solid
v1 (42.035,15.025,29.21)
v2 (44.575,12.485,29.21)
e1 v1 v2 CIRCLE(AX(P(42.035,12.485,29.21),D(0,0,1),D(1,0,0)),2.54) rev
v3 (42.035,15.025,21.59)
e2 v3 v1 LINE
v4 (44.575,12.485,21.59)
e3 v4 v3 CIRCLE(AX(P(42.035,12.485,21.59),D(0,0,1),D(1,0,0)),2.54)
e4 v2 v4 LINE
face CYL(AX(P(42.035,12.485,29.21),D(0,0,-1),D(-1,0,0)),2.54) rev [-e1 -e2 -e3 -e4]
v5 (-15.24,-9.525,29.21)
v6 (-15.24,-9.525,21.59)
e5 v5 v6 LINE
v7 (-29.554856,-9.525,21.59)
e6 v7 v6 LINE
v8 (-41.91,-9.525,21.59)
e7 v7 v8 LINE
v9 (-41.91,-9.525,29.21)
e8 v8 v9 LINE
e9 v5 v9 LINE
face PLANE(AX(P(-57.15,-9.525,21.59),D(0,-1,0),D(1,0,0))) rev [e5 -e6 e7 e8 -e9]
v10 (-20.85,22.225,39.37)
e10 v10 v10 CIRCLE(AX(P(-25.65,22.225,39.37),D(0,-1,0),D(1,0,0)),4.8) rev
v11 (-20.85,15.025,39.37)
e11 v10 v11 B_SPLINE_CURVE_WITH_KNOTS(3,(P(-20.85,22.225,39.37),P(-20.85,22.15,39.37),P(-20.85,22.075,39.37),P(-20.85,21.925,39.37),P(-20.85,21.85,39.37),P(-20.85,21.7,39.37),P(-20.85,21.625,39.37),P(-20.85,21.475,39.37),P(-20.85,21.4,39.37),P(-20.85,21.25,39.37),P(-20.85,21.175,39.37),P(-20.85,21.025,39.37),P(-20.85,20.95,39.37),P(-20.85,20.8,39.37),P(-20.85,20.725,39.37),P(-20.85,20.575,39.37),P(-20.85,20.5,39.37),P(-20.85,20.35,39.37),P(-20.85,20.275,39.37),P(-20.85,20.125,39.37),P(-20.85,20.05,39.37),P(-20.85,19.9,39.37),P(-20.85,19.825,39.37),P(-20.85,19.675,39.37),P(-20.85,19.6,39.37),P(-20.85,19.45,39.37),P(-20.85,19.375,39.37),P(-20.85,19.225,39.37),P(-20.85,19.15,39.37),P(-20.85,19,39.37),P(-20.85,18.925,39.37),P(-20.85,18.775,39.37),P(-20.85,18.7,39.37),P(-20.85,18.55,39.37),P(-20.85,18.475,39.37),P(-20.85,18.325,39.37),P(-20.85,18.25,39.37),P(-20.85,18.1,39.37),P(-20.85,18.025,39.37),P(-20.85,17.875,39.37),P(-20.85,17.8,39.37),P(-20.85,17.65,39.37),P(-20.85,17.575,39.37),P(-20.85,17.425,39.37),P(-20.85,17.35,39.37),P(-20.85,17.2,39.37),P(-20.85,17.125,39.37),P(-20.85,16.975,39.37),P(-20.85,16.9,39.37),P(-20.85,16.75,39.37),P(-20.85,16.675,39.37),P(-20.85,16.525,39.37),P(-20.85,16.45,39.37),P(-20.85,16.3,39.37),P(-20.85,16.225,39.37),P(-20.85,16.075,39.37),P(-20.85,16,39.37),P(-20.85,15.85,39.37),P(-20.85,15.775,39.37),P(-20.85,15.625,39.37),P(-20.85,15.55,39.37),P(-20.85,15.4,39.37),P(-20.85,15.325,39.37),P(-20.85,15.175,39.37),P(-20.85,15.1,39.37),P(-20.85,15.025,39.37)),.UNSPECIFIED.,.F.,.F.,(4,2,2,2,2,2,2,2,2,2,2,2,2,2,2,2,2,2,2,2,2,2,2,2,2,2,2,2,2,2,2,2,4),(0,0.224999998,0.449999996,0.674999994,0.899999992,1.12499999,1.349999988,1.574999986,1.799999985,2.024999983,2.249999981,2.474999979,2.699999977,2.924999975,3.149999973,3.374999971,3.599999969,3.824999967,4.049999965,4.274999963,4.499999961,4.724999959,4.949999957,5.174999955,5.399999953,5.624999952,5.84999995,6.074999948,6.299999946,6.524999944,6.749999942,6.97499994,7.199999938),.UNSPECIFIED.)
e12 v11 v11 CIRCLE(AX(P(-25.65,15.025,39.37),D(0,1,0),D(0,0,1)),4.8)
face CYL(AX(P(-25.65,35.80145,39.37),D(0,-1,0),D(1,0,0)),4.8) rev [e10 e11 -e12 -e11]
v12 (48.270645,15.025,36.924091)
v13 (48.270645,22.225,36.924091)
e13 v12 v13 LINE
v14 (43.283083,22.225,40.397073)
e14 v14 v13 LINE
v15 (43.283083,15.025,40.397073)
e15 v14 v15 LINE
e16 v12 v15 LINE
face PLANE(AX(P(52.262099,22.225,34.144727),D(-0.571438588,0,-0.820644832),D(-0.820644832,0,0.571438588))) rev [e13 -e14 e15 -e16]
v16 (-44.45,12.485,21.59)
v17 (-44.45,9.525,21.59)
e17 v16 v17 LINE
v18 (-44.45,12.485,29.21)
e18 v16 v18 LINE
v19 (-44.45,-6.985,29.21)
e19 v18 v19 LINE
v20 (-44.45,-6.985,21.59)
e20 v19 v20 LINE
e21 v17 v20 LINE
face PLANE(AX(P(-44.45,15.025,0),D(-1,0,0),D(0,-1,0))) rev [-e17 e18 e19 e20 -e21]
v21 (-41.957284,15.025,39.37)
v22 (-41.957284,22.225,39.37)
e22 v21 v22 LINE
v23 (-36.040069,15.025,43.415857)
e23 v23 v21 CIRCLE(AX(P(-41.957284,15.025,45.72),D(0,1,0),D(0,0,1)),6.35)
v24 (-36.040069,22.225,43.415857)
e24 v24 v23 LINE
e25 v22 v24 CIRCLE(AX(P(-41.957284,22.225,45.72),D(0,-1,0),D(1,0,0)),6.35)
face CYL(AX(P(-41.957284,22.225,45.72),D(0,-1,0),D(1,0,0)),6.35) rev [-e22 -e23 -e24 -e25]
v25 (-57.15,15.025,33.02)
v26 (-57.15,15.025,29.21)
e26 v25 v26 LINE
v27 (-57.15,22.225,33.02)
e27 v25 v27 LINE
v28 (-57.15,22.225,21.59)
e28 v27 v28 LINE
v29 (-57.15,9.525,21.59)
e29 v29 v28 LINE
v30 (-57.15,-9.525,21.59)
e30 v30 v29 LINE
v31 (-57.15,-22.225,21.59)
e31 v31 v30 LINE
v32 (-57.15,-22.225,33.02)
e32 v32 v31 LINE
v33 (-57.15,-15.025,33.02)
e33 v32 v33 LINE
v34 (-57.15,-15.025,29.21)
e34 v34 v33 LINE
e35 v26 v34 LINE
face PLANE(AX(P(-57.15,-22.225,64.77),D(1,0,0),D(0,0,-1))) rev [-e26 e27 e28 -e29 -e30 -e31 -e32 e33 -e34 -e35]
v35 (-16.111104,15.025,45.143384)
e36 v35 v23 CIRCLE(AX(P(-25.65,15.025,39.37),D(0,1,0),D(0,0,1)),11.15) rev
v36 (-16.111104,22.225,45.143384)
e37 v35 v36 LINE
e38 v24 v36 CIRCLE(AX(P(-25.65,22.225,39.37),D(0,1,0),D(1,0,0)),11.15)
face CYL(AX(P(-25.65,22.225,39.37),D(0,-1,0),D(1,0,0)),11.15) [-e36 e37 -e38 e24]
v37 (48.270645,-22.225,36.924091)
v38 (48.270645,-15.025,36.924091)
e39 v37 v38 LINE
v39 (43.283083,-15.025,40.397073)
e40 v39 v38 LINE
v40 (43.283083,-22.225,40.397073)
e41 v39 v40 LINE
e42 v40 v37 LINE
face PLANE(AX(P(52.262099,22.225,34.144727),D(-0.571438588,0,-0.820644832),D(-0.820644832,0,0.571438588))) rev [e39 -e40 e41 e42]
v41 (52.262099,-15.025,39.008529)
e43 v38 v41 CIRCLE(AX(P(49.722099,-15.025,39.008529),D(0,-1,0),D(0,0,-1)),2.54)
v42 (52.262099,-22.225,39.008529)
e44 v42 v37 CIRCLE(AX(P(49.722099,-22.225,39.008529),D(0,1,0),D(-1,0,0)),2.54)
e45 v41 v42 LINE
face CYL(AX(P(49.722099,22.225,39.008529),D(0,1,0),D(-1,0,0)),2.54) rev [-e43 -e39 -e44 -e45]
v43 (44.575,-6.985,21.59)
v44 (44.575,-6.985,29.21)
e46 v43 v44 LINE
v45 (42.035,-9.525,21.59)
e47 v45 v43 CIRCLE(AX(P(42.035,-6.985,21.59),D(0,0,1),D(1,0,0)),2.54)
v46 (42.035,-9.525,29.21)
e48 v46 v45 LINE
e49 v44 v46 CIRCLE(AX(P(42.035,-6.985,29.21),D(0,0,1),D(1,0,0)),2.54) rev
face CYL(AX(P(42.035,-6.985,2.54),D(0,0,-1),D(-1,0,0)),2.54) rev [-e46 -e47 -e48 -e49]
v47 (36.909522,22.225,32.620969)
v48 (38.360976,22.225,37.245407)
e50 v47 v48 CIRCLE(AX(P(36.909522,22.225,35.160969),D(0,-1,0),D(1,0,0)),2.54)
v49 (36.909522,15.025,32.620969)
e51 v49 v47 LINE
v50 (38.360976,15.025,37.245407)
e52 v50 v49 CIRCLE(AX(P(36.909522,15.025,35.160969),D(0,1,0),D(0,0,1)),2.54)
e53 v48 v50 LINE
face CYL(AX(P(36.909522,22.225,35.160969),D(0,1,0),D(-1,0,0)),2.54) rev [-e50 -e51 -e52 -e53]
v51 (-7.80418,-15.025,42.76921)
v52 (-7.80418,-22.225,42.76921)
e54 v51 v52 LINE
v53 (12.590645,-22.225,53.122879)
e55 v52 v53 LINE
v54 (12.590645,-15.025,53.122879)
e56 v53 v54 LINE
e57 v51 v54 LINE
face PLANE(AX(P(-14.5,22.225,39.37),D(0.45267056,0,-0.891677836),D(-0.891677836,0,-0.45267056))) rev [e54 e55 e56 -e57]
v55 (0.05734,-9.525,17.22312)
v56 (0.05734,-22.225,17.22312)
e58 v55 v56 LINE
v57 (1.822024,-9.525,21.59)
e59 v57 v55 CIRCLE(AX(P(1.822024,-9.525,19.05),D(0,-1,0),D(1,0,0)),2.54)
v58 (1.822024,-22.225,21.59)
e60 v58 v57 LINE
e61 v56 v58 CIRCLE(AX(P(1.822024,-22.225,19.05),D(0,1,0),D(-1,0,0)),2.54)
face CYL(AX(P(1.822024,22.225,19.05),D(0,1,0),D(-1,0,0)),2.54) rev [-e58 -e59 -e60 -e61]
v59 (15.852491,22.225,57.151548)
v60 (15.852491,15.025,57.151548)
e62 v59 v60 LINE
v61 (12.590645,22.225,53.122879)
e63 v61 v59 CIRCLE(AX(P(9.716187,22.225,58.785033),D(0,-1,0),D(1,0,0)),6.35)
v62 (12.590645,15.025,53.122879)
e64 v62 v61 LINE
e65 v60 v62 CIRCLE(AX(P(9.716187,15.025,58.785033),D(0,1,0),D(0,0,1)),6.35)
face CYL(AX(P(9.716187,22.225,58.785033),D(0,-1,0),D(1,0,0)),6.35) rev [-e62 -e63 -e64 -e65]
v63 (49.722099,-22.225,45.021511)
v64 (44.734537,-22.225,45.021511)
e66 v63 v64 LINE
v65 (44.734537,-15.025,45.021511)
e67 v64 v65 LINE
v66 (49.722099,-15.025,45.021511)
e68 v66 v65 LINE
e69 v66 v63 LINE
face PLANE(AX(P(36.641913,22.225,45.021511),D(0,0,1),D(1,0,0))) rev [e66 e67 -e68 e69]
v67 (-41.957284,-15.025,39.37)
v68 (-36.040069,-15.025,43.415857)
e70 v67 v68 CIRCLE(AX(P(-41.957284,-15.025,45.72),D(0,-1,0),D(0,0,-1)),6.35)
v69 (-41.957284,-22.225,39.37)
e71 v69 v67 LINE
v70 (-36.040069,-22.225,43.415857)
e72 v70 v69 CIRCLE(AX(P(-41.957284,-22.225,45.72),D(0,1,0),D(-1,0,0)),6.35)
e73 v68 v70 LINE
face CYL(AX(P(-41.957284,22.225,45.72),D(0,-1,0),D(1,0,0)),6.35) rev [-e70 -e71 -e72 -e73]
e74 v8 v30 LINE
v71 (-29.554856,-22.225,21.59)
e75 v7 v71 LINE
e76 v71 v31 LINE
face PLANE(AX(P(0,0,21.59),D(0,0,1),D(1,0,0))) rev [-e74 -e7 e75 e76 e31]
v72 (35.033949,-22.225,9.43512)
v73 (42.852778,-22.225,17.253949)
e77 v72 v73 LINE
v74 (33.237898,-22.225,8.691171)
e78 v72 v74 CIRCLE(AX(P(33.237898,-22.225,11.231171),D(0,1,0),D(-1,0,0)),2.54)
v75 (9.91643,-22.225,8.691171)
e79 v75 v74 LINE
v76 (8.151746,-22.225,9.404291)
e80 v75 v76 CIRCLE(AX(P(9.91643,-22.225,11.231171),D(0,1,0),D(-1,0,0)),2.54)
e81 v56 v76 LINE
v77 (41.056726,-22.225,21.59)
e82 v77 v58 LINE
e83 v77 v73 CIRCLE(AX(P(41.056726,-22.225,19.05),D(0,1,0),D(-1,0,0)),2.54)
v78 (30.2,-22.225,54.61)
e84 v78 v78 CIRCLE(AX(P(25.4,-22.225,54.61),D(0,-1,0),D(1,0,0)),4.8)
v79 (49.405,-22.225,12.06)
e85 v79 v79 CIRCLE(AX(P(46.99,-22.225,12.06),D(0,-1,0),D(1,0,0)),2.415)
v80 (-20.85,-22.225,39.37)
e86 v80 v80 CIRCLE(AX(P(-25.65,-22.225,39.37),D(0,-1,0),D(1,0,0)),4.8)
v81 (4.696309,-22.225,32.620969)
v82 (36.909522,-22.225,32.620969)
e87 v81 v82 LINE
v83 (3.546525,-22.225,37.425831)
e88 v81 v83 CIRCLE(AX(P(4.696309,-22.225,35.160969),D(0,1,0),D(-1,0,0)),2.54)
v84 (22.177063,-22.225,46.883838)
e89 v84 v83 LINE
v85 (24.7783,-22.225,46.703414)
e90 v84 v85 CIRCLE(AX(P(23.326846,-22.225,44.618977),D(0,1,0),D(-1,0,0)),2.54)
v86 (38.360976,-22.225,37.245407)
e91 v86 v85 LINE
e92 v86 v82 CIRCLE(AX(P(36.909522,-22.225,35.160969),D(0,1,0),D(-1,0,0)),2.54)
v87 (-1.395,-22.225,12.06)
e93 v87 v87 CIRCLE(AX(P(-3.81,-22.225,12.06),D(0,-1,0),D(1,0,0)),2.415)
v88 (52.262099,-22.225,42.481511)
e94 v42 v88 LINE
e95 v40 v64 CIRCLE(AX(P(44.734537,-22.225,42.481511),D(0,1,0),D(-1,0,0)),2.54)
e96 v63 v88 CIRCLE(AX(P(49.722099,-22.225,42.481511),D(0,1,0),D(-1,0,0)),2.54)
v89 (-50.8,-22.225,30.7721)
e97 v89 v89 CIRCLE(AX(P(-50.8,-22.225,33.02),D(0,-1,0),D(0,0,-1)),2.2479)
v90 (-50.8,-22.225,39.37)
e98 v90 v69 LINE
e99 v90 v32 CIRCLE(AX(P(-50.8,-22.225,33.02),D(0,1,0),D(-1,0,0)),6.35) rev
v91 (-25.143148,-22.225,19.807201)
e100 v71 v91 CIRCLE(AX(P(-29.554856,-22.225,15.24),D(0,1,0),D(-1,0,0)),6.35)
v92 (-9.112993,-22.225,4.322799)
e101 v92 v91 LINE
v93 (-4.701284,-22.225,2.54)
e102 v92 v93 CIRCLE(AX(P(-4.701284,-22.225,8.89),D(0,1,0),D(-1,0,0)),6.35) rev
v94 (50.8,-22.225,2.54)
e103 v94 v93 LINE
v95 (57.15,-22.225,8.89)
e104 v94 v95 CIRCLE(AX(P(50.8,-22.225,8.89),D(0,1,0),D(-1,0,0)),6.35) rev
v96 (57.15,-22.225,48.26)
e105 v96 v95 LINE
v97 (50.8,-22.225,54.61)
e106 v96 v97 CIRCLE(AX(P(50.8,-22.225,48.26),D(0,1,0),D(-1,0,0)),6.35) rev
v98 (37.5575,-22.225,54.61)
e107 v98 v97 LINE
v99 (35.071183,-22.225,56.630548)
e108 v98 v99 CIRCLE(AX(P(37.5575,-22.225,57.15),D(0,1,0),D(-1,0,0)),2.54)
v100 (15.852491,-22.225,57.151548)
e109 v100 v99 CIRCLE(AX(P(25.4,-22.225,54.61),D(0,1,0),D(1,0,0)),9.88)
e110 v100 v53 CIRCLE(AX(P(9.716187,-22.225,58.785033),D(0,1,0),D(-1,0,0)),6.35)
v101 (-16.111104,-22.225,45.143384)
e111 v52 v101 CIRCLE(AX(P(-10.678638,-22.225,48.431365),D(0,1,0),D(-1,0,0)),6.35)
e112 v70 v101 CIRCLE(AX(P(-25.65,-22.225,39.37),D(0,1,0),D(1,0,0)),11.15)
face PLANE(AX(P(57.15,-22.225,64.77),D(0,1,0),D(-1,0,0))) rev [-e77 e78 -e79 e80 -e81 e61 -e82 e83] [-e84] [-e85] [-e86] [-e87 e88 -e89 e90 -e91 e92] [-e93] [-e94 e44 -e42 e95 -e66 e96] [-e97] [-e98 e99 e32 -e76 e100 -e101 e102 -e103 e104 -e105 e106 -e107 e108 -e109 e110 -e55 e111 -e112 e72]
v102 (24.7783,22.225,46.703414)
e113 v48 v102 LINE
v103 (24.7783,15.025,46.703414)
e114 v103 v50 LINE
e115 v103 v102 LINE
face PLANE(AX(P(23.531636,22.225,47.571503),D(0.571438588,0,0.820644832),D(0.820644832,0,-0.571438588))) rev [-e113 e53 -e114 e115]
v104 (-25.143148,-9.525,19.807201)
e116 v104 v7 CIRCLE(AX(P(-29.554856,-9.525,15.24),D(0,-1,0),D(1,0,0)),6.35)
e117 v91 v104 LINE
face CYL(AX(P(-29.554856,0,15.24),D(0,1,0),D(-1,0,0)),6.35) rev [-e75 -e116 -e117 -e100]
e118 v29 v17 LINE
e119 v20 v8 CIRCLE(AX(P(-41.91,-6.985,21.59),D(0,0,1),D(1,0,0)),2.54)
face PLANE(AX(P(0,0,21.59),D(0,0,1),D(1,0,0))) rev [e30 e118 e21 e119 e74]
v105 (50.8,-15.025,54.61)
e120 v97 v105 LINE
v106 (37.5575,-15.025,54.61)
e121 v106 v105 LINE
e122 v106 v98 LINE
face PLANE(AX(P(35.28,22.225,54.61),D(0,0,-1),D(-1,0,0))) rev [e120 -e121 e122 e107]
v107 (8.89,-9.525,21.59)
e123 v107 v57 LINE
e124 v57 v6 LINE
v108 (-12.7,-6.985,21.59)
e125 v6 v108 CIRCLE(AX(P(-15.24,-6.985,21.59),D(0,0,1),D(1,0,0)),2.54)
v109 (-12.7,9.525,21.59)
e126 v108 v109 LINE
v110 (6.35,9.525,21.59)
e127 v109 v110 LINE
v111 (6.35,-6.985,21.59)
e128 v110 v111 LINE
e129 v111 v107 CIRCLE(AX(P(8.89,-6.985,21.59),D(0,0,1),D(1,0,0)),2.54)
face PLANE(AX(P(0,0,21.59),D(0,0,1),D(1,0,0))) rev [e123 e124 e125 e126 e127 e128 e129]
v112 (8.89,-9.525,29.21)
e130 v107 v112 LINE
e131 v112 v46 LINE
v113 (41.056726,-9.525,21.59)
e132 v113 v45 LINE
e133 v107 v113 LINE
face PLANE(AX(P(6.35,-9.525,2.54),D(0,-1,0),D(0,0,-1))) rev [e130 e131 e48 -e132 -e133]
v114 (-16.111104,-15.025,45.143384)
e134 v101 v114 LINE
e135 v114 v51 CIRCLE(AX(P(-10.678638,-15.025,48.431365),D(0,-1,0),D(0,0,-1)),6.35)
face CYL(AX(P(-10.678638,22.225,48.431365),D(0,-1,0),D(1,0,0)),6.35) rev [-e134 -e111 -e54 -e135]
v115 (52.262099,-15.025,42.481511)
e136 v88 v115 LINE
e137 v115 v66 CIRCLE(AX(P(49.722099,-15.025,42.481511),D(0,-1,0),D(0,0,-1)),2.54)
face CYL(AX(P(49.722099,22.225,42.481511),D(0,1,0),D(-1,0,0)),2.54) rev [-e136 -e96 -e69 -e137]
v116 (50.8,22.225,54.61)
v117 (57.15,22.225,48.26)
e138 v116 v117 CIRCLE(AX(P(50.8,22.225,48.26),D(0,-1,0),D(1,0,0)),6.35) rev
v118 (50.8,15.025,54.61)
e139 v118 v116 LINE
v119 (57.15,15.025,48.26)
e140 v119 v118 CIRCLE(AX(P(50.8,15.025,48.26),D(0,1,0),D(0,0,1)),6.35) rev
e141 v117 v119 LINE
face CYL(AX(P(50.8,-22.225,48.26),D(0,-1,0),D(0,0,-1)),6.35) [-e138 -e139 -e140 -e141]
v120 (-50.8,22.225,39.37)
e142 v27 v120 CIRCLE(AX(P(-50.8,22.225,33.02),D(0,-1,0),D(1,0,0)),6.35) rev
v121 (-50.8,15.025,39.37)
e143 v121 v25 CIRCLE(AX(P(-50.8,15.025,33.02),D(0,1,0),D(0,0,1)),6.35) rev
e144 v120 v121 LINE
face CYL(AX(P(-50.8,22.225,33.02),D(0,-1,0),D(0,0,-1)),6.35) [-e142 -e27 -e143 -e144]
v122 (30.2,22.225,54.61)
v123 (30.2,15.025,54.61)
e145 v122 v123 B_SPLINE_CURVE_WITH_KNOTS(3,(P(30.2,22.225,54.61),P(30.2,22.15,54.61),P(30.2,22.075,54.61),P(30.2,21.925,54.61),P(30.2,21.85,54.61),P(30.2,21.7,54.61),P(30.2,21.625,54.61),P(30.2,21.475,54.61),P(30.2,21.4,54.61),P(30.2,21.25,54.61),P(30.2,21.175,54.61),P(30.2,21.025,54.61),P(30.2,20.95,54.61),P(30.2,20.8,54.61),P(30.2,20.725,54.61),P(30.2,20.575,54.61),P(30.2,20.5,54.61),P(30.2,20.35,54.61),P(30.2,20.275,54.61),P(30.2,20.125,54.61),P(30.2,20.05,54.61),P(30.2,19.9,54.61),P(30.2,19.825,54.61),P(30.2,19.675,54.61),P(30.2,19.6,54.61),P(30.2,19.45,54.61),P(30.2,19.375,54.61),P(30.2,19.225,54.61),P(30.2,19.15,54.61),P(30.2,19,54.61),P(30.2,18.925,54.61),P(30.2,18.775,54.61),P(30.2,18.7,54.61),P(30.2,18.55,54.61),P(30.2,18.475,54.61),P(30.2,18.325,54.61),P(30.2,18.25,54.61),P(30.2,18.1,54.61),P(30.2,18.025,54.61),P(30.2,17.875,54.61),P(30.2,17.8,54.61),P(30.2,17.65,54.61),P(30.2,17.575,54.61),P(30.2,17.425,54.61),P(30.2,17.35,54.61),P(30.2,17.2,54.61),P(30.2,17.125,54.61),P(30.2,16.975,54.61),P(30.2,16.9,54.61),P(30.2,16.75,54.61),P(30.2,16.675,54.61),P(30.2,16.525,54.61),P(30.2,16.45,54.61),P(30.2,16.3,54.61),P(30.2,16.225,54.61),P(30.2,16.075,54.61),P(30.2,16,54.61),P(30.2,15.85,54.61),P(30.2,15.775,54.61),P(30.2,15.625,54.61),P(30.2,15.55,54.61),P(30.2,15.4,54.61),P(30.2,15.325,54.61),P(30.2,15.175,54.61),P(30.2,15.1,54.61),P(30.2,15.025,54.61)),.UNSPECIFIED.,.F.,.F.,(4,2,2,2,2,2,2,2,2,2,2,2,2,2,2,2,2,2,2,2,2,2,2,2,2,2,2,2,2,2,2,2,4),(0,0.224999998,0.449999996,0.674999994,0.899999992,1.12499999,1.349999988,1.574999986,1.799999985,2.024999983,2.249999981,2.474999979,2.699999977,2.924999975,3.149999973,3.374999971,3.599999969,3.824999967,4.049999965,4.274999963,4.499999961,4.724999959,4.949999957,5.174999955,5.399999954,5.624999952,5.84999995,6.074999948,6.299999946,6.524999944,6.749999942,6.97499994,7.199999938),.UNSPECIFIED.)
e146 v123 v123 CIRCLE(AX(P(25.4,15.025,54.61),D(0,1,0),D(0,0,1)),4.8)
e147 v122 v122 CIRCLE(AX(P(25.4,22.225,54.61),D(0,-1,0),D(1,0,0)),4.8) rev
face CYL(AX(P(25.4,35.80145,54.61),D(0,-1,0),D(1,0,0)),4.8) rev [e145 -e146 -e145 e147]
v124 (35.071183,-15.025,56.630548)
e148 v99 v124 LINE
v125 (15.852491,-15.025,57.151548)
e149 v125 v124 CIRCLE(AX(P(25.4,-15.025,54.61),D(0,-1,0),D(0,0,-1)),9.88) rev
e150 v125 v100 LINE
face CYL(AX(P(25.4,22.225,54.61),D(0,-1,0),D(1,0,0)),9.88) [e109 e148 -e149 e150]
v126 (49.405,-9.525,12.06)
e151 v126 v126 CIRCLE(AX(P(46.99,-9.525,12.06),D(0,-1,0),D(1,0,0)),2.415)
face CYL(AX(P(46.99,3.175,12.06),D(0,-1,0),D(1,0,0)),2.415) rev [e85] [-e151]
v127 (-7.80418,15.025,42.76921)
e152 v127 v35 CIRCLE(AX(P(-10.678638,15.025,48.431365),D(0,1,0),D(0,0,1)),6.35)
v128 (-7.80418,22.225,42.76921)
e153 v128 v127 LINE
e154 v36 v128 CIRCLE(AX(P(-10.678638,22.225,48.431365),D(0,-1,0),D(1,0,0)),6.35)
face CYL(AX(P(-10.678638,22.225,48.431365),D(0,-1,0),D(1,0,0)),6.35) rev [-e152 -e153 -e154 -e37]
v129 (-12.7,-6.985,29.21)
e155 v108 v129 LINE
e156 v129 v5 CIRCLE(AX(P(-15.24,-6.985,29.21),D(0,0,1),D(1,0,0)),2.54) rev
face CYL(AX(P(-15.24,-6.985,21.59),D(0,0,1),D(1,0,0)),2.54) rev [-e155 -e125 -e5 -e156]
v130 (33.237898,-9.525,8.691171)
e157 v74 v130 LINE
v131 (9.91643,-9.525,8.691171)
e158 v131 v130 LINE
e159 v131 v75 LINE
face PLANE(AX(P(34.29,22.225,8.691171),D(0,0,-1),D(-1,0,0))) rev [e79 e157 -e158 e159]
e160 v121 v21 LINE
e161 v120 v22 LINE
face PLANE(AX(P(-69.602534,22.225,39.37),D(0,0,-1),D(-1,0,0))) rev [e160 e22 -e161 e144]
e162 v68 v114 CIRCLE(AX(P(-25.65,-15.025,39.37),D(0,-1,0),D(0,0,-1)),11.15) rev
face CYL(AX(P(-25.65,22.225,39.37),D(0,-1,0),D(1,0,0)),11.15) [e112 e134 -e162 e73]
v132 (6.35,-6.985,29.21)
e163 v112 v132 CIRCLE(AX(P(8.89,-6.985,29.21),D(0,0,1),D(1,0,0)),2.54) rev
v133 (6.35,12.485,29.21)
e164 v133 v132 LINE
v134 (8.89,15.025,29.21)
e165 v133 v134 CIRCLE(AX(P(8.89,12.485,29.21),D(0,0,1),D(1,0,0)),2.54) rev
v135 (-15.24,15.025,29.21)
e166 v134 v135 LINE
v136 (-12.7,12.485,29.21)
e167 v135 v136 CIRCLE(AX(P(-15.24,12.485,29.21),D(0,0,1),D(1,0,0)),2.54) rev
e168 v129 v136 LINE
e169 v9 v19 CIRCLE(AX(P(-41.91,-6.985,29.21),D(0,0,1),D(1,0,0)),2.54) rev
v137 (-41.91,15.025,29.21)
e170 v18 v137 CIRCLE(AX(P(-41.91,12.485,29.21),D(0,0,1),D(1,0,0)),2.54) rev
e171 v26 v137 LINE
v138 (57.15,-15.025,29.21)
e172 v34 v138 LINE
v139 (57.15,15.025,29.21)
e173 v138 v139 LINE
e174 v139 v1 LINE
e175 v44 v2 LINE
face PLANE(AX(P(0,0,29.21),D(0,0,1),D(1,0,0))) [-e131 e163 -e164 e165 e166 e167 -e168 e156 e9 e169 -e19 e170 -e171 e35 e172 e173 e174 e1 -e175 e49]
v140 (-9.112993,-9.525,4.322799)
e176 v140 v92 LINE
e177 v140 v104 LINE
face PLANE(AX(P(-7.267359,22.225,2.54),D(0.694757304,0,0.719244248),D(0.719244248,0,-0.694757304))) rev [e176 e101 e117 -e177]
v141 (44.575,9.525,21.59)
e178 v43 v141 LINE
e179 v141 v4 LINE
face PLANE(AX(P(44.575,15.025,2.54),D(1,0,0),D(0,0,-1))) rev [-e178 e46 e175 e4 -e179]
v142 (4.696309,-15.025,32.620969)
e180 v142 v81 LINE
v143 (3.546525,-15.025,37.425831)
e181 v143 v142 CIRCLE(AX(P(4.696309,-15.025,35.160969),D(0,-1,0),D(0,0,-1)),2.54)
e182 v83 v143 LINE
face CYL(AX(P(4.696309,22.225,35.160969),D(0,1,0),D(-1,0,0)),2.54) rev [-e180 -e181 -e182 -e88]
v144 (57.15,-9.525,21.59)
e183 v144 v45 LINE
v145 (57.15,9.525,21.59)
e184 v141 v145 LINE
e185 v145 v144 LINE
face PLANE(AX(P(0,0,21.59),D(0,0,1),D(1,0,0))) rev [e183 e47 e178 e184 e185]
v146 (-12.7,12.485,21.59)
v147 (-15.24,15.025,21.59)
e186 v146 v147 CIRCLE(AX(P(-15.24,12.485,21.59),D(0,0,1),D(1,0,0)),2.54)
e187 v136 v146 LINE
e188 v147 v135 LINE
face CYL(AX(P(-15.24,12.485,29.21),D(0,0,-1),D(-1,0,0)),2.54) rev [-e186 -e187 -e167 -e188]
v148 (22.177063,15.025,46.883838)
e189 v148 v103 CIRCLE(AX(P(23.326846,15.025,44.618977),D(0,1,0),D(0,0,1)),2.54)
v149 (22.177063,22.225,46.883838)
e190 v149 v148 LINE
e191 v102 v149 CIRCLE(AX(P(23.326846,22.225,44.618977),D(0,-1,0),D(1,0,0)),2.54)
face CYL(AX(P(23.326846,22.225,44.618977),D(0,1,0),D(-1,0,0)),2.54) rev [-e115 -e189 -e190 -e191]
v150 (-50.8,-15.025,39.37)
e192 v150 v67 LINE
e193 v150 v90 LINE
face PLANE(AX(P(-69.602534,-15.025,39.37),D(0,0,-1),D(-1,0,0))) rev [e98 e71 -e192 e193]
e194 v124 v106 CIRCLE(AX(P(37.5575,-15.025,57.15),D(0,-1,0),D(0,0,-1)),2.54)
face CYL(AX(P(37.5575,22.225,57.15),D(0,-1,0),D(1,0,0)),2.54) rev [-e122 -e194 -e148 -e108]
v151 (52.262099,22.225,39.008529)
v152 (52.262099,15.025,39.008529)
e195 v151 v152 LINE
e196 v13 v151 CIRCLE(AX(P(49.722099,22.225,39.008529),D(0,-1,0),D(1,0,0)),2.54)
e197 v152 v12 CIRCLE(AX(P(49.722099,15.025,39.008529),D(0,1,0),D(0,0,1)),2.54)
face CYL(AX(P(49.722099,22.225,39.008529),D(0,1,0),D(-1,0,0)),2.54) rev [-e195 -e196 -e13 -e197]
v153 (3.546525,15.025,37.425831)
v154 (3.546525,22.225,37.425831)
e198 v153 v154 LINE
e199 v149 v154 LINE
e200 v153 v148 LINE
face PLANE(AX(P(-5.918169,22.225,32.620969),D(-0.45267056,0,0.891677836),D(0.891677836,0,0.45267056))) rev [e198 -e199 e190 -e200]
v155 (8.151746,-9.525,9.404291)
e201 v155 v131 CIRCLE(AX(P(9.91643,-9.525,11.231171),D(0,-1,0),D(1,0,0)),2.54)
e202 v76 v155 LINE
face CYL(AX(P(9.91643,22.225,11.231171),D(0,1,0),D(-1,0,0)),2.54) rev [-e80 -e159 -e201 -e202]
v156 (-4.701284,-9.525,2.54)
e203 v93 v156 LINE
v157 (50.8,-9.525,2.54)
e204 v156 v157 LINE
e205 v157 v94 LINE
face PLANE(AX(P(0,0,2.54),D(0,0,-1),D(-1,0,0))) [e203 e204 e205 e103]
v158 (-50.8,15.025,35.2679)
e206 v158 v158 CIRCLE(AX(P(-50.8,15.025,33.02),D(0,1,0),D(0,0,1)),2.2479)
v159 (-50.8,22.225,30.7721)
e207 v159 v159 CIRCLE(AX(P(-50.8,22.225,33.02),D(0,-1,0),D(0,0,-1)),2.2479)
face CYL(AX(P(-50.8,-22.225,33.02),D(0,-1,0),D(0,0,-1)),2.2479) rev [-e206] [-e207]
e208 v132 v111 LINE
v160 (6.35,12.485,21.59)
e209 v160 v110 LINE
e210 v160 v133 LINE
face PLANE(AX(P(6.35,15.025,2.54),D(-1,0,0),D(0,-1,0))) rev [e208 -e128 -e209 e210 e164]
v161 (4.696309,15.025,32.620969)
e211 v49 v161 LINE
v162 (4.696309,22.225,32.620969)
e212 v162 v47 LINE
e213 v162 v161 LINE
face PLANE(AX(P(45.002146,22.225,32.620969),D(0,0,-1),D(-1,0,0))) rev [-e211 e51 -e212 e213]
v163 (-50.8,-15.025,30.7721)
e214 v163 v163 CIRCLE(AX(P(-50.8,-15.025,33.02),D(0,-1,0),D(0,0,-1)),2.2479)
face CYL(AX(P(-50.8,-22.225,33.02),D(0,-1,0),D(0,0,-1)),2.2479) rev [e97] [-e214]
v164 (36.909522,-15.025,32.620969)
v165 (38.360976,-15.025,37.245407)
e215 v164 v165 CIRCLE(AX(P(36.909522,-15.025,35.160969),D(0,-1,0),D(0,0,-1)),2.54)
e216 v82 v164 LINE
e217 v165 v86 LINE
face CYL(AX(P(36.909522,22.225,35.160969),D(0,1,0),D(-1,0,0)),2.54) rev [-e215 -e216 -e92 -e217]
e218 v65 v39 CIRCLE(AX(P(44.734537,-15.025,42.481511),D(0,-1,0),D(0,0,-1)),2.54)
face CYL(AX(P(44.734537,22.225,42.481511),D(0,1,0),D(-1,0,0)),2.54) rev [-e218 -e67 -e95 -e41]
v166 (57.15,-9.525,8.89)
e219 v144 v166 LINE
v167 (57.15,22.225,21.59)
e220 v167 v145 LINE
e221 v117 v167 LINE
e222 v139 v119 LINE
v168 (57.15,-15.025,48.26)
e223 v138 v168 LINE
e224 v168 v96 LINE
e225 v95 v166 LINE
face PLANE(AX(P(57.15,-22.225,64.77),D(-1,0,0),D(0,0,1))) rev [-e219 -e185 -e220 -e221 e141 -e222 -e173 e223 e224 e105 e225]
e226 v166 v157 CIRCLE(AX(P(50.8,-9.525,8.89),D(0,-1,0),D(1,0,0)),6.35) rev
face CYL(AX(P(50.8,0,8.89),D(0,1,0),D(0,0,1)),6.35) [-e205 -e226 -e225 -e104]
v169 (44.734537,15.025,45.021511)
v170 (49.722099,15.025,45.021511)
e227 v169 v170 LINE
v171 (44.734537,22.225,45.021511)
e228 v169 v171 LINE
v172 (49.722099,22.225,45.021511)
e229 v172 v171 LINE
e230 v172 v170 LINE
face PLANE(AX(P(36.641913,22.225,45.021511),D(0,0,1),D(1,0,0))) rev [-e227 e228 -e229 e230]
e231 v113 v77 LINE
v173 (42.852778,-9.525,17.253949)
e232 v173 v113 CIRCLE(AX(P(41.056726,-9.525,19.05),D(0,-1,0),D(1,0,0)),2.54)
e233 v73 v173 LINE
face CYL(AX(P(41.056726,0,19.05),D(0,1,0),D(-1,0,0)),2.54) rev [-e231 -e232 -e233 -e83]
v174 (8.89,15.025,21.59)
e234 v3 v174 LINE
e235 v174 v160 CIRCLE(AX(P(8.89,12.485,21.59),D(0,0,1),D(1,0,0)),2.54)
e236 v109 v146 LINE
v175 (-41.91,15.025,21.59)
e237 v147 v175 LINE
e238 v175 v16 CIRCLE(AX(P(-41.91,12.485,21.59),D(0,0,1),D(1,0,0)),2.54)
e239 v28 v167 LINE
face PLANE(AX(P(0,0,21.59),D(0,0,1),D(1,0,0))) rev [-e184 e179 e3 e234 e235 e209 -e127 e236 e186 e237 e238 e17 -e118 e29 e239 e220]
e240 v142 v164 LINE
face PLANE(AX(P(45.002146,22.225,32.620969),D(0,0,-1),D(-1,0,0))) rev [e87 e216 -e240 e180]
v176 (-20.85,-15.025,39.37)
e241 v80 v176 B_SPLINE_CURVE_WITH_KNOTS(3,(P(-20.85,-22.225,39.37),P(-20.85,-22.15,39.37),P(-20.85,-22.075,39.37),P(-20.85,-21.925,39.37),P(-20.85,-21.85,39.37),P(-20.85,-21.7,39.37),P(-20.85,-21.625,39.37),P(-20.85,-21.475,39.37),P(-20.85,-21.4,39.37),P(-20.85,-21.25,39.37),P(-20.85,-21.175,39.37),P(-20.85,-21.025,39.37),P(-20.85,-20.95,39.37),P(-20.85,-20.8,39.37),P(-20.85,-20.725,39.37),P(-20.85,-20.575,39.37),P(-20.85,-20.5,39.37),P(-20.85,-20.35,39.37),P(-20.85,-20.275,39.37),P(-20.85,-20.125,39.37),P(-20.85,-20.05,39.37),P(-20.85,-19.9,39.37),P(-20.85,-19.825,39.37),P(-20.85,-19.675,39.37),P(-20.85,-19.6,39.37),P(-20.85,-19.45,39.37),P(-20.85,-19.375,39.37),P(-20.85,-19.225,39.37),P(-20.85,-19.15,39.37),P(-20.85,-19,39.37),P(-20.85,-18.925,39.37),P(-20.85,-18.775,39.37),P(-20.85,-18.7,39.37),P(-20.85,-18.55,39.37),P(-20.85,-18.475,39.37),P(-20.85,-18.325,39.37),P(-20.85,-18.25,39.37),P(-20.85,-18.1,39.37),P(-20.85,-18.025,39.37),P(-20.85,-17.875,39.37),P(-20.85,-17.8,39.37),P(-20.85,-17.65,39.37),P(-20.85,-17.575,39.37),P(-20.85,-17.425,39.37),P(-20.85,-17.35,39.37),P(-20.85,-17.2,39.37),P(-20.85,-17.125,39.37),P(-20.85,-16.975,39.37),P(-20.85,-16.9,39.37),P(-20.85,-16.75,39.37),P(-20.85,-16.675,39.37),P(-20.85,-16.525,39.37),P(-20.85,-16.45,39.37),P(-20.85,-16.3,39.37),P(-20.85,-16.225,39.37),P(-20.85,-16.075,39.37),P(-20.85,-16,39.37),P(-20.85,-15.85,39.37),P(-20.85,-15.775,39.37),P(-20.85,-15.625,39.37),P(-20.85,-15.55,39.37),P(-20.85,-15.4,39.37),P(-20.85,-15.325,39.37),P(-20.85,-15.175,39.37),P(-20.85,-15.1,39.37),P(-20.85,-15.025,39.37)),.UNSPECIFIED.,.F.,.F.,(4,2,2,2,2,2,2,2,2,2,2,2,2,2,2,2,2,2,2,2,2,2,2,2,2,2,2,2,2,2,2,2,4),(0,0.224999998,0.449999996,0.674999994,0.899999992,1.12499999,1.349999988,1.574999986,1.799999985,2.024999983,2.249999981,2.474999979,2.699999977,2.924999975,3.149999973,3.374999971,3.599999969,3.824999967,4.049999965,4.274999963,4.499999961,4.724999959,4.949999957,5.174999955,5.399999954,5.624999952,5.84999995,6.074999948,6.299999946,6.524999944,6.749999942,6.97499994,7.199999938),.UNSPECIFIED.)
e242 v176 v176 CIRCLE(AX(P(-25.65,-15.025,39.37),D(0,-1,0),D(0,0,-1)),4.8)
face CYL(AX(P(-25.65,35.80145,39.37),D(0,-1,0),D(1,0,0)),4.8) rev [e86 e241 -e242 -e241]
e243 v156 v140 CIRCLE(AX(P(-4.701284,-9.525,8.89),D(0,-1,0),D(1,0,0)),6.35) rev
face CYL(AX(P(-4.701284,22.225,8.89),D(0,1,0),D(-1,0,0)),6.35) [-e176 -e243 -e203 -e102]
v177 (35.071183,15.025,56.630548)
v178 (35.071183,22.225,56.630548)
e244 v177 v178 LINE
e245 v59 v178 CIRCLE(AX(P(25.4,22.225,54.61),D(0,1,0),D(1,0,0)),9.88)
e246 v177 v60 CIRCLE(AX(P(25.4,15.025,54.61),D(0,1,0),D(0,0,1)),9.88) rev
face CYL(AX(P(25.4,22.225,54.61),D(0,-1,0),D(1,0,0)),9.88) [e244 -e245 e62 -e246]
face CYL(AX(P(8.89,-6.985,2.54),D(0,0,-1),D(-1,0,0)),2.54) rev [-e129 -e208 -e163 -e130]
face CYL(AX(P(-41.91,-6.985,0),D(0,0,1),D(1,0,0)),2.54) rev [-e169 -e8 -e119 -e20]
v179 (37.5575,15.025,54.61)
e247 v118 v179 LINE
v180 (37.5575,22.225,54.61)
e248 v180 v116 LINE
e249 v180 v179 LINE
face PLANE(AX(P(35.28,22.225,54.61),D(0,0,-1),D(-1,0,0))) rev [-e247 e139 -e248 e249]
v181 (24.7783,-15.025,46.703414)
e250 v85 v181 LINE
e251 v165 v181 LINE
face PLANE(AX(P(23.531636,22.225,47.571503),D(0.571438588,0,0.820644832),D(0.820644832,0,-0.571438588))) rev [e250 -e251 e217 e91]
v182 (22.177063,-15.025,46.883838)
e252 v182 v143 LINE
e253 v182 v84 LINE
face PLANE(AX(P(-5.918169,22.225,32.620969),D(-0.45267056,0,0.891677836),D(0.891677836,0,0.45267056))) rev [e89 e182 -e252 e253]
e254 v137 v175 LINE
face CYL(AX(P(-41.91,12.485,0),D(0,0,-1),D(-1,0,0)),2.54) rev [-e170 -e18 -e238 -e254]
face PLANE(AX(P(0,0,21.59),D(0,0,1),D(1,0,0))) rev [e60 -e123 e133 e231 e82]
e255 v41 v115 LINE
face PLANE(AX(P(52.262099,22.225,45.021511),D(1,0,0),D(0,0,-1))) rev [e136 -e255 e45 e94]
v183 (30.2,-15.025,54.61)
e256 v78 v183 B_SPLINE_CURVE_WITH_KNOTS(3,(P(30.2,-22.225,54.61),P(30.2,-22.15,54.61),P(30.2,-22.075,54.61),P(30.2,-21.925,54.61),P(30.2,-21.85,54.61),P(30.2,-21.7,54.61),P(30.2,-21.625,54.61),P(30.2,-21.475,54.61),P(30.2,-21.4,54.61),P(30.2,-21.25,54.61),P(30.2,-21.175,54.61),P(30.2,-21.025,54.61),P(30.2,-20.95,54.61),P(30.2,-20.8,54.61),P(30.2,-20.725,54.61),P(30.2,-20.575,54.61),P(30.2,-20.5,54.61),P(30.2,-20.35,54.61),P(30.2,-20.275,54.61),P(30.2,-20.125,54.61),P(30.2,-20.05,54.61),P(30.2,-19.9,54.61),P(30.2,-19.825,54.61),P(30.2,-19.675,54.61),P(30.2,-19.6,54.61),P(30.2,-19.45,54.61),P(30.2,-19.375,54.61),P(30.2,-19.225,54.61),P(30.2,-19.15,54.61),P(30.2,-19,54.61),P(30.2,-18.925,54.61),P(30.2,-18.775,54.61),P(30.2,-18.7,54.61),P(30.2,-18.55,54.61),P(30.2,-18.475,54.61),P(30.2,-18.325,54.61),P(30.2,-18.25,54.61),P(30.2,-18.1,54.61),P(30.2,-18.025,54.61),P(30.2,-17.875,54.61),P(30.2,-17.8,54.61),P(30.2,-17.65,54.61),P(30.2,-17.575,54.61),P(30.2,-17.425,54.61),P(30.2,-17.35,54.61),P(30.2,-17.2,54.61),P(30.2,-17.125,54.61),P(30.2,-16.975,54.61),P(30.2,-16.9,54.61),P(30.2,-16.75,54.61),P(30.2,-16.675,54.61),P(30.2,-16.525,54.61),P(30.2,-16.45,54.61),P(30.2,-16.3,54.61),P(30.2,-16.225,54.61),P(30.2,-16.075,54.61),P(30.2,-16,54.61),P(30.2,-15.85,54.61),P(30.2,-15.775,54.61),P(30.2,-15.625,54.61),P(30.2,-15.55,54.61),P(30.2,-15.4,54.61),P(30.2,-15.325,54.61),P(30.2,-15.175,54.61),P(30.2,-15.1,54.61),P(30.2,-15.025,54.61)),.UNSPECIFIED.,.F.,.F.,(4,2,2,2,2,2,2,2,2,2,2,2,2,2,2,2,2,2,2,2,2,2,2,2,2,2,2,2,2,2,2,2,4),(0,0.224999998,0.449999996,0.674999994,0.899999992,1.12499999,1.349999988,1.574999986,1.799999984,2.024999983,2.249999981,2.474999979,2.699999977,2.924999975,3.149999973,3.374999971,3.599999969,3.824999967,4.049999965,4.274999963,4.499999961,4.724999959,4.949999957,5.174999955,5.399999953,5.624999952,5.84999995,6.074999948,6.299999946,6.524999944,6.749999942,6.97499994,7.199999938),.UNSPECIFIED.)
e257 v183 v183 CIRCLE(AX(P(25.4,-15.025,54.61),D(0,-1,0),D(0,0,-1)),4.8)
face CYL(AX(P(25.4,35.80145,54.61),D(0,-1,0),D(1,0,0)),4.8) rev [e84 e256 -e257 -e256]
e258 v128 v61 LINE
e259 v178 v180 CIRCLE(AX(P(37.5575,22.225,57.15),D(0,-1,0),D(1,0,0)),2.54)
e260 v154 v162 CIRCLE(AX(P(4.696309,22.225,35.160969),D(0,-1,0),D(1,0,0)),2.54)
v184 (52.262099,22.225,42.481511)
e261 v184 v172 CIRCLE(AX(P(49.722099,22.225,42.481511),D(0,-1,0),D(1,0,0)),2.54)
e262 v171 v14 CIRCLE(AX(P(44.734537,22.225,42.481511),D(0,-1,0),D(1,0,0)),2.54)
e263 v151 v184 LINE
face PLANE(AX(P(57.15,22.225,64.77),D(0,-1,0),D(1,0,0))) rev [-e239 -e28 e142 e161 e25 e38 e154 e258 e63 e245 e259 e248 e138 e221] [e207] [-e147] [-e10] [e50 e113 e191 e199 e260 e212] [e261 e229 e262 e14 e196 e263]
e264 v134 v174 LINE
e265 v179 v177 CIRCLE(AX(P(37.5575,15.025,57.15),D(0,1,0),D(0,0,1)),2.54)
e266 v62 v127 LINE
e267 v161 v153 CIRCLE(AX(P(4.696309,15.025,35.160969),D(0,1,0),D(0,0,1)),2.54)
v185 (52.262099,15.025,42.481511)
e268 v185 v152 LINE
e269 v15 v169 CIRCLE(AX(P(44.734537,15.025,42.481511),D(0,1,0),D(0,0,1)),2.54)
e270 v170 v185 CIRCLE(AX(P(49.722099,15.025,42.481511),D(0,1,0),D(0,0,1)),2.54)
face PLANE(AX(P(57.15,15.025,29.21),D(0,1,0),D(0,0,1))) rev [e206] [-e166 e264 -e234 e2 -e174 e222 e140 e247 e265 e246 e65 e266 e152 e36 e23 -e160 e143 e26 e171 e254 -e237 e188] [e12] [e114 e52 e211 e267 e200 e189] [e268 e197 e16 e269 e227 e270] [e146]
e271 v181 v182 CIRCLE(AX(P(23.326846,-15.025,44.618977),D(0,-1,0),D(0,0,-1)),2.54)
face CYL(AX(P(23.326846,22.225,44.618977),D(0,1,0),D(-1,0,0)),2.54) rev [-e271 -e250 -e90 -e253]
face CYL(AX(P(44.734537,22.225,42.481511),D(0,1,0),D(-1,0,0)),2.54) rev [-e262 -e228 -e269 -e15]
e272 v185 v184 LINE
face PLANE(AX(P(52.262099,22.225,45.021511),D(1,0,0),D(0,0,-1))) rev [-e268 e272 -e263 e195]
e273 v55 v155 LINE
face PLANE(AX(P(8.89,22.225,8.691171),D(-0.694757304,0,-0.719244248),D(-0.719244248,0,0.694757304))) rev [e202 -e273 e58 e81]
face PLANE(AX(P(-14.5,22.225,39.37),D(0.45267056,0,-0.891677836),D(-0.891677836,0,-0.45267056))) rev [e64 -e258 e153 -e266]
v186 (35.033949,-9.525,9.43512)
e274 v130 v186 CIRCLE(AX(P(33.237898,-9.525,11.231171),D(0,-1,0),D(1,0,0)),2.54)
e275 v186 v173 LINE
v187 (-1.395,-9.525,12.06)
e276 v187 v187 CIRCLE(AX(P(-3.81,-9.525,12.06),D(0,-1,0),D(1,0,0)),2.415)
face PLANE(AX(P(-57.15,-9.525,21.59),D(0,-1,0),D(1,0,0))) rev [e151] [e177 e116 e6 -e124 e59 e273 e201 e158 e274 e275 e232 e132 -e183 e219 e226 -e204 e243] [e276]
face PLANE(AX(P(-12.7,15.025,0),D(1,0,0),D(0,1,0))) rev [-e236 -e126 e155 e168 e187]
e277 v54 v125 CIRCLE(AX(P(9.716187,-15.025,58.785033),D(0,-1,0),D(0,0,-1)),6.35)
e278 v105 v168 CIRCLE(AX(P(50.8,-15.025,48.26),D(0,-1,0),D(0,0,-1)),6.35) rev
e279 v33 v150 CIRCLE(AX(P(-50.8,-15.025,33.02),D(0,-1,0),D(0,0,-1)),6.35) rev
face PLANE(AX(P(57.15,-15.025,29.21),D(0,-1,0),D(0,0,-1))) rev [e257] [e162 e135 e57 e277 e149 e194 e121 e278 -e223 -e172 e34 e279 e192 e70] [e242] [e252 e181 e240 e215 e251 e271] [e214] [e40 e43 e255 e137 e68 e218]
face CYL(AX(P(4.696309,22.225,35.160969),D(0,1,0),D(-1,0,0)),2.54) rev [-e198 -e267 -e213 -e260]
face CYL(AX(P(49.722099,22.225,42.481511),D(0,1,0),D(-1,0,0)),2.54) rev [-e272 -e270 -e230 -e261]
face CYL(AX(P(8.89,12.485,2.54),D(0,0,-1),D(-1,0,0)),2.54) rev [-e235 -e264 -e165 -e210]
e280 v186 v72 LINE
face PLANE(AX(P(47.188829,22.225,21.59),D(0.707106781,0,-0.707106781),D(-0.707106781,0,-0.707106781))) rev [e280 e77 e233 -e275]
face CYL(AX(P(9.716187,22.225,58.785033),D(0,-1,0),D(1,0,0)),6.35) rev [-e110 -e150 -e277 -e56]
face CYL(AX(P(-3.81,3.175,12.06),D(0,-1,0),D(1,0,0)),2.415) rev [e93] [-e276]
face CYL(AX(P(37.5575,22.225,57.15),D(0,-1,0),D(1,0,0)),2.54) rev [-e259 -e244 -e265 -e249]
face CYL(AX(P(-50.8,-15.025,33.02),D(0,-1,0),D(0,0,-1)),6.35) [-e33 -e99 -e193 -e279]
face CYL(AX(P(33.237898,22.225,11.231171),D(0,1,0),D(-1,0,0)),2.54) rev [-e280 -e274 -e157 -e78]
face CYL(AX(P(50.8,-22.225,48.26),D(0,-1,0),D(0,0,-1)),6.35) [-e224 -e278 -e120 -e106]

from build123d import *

# Parameters (mm, degrees)
SKETCH1_W               = 114.3
SKETCH1_H               = 44.45
BOSS_EXTRUDE1_DEPTH     = 64.77
SKETCH2_W               = 114.3
SKETCH2_H               = 30.050000124
CUT_EXTRUDE2_DEPTH      = 35.56
SKETCH3_W               = 114.3
SKETCH3_H               = 31.75
CUT_EXTRUDE3_DEPTH      = 21.59
SKETCH5_R               = 2.415
CUT_EXTRUDE4_DEPTH      = 25.4
CUT_EXTRUDE6_REACH      = 99.145
SKETCH7_R               = 4.8
CUT_EXTRUDE7_DEPTH      = 71.884319317
CUT_EXTRUDE7_DEPTH_BACK = 71.884319317
SKETCH9_W               = 31.75
SKETCH9_H               = 30.050000124
CUT_EXTRUDE8_DEPTH      = 98.144623629
BOSS_EXTRUDE2_REACH     = 99.632
SKETCH14_W              = 21.59
SKETCH14_H              = 5.500000062
SKETCH17_W              = 31.75
SKETCH17_H              = 5.500000062
BOSS_EXTRUDE3_DEPTH     = 7.62
SKETCH25_W              = 10.16
SKETCH25_H              = 7.199999938
BOSS_EXTRUDE5_DEPTH     = 20.35
F_8_CLEARANCE_HOLE1_D   = 4.4958
SKETCH31_W              = 114.3
SKETCH31_H              = 12.7
CUT_EXTRUDE9_DEPTH      = 2.54
CUT_EXTRUDE10_DEPTH     = 97.958161596
FILLET2_R               = 2.54
FILLET3_R               = 6.35
CUT_EXTRUDE11_DEPTH     = 97.958161596
SKETCH36_W              = 38.225
SKETCH36_H              = 24.550000062
CUT_EXTRUDE12_DEPTH     = 71.744268496
FILLET1_START           = -22.225
FILLET1_DEPTH           = 7.199999938
FILLET1_START_2         = 15.025000062
FILLET1_2_DEPTH         = 7.199999938
FILLET1_START_3         = -15.025000062
FILLET1_3_DEPTH         = 5.500000062
FILLET4_R               = 2.54


with BuildPart() as part:
    # Sketch1 → Boss-Extrude1 (new body)
    with BuildSketch(Plane.XY):
        Rectangle(SKETCH1_W, SKETCH1_H)
    extrude(amount=BOSS_EXTRUDE1_DEPTH)

    # Sketch2 → Cut-Extrude2 (cut)
    with BuildSketch(Plane.XY.offset(64.77)):
        Rectangle(SKETCH2_W, SKETCH2_H)
    extrude(amount=-CUT_EXTRUDE2_DEPTH, mode=Mode.SUBTRACT)

    # Sketch3 → Cut-Extrude3 (cut)
    with BuildSketch(Plane(origin=(0, 0, 0), x_dir=(-1, 0, 0), z_dir=(0, 0, -1))):
        with Locations((0, 6.35)):
            Rectangle(SKETCH3_W, SKETCH3_H)
    extrude(amount=-CUT_EXTRUDE3_DEPTH, mode=Mode.SUBTRACT)

    # Sketch5 → Cut-Extrude4 (cut)
    with BuildSketch(Plane.XZ.offset(22.225)):
        with Locations((-3.81, 12.06)):
            Circle(SKETCH5_R)
        with Locations((46.99, 12.06)):
            Circle(SKETCH5_R)
    extrude(amount=-CUT_EXTRUDE4_DEPTH, mode=Mode.SUBTRACT)

    # Cut-Extrude6: up to this face of the body (flat: up to its plane)
    cut_extrude6_end = Plane(part.part.faces().sort_by_distance((0, 22.225, 43.18))[0])
    # Sketch7 → Cut-Extrude6 (cut, up to the picked face)
    with BuildSketch(Plane.XZ.offset(22.225), mode=Mode.PRIVATE) as cut_extrude6_sk1:
        with Locations((25.4, 54.61)):
            Circle(SKETCH7_R)
    cut_extrude6_tool1 = split(extrude(cut_extrude6_sk1.sketch, amount=-CUT_EXTRUDE6_REACH, mode=Mode.PRIVATE), bisect_by=cut_extrude6_end, keep=Keep.BOTH, mode=Mode.PRIVATE)
    # Sketch7 → Cut-Extrude6 (cut, up to the picked face)
    with BuildSketch(Plane.XZ.offset(22.225), mode=Mode.PRIVATE) as cut_extrude6_sk2:
        with Locations((-25.65, 39.37)):
            Circle(SKETCH7_R)
    cut_extrude6_tool2 = split(extrude(cut_extrude6_sk2.sketch, amount=-CUT_EXTRUDE6_REACH, mode=Mode.PRIVATE), bisect_by=cut_extrude6_end, keep=Keep.BOTH, mode=Mode.PRIVATE)
    add(cut_extrude6_tool1.solids().sort_by(Axis((25.4, -22.225, 54.61), (0, 1, 0)))[0], mode=Mode.SUBTRACT)
    add(cut_extrude6_tool2.solids().sort_by(Axis((-25.65, -22.225, 39.37), (0, 1, 0)))[0], mode=Mode.SUBTRACT)

    # Sketch9 → Cut-Extrude7 (cut, two sides: drawn at the far end of the back side and taken through both)
    with BuildSketch(Plane.XY.offset(29.21).offset(-CUT_EXTRUDE7_DEPTH_BACK)):
        with Locations((-28.575, 0)):
            Rectangle(SKETCH9_W, SKETCH9_H)
    extrude(amount=CUT_EXTRUDE7_DEPTH + CUT_EXTRUDE7_DEPTH_BACK, mode=Mode.SUBTRACT)

    # Sketch16 → Cut-Extrude8 (cut, through all)
    with BuildSketch(Plane.XZ.offset(22.225)):
        with BuildLine():
            Line((-36.8, 39.37), (-36.8, 29.21))
            Line((-36.8, 29.21), (-49.091020336, 29.21))
            Line((-49.091020336, 29.21), (-57.15, 29.21))
            Line((-57.15, 29.21), (-57.15, 64.77))
            Line((-57.15, 64.77), (57.15, 64.77))
            Line((57.15, 64.77), (57.15, 54.61))
            Line((57.15, 54.61), (35.28, 54.61))
            ThreePointArc((35.28, 54.61), (25.4, 64.49), (15.52, 54.61))
            Line((15.52, 54.61), (-14.5, 39.37))
            ThreePointArc((-14.5, 39.37), (-25.65, 50.52), (-36.8, 39.37))
        make_face()
    extrude(amount=-CUT_EXTRUDE8_DEPTH, mode=Mode.SUBTRACT)

    # Sketch14 → Boss-Extrude2 (add, up to next)
    with BuildSketch(Plane.ZY.offset(12.7), mode=Mode.PRIVATE) as boss_extrude2_sk1:
        with Locations((10.795, -12.275000031)):
            Rectangle(SKETCH14_W, SKETCH14_H)
    boss_extrude2_tool1 = extrude(boss_extrude2_sk1.sketch, amount=BOSS_EXTRUDE2_REACH, mode=Mode.PRIVATE) - part.part
    add(boss_extrude2_tool1.solids().sort_by_distance((-12.7, -12.275, 10.795))[0])

    # Sketch17 → Boss-Extrude3 (add)
    with BuildSketch(Plane.XY.offset(21.59)):
        with Locations((-28.575, -12.275000031)):
            Rectangle(SKETCH17_W, SKETCH17_H)
    extrude(amount=BOSS_EXTRUDE3_DEPTH)

    # Sketch25 → Boss-Extrude5 (add)
    with BuildSketch(Plane.ZY.offset(36.8)):
        with Locations((34.29, 18.625000031)):
            Rectangle(SKETCH25_W, SKETCH25_H)
        with Locations((34.29, -18.625000031)):
            Rectangle(SKETCH25_W, SKETCH25_H)
    extrude(amount=BOSS_EXTRUDE5_DEPTH)

    # #8 Clearance Hole1 (through all)
    with Locations(Plane(origin=(0, -22.225, 0), x_dir=(-1, 0, 0), z_dir=(0, -1, 0))):
        with Locations((50.8, -33.02)):
            Hole(F_8_CLEARANCE_HOLE1_D / 2)

    # Sketch31 → Cut-Extrude9 (cut)
    with BuildSketch(Plane(origin=(0, 0, 0), x_dir=(-1, 0, 0), z_dir=(0, 0, -1))):
        with Locations((0, -15.875)):
            Rectangle(SKETCH31_W, SKETCH31_H)
    extrude(amount=-CUT_EXTRUDE9_DEPTH, mode=Mode.SUBTRACT)

    # Sketch32 → Cut-Extrude10 (cut, through all)
    with BuildSketch(Plane.XZ.offset(22.225)):
        Polygon((-5.918169451, 32.620968913), (23.531635553, 47.571502833), (45.002146373, 32.620968913), align=None)
        Polygon((36.641912944, 45.021511278), (52.262098779, 45.021511278), (52.262098779, 34.144726831), align=None)
        Polygon((-57.15, 2.54), (-7.267358513, 2.54), (-26.98878189, 21.59), (-57.15, 21.59), align=None)
    extrude(amount=-CUT_EXTRUDE10_DEPTH, mode=Mode.SUBTRACT)

    # Fillet2
    fillet2_edges = [part.edges().sort_by_distance(p)[0] for p in [
        (35.28, 18.625000031, 54.61),
        (35.28, -18.625000031, 54.61),
    ]]
    fillet(fillet2_edges, radius=FILLET2_R)

    # Fillet3
    fillet3_edges = [part.edges().sort_by_distance(p)[0] for p in [
        (57.15, 18.625000031, 54.61),
        (57.15, -18.625000031, 54.61),
        (15.52, 18.625000031, 54.61),
        (15.52, -18.625000031, 54.61),
        (-14.5, 18.625000031, 39.37),
        (-14.5, -18.625000031, 39.37),
        (-36.8, 18.625000031, 39.37),
        (-36.8, -18.625000031, 39.37),
        (-57.15, 18.625000031, 39.37),
        (-57.15, -18.625000031, 39.37),
        (57.15, -15.875, 2.54),
        (-7.267358513, -15.875, 2.54),
        (-26.98878189, -15.875, 21.59),
    ]]
    fillet(fillet3_edges, radius=FILLET3_R)

    # Sketch35 → Cut-Extrude11 (cut, through all)
    with BuildSketch(Plane.XZ.offset(22.225)):
        Polygon((-4.463452319, 21.59), (47.188828945, 21.59), (34.29, 8.691171055), (8.89, 8.691171055), align=None)
    extrude(amount=-CUT_EXTRUDE11_DEPTH, mode=Mode.SUBTRACT)

    # Sketch36 → Cut-Extrude12 (cut, through all)
    with BuildSketch(Plane.XY.offset(29.21)):
        with Locations((25.4625, 2.750000031)):
            Rectangle(SKETCH36_W, SKETCH36_H)
    extrude(amount=-CUT_EXTRUDE12_DEPTH, mode=Mode.SUBTRACT)

    # Fillet1: read off the stored shape, not the designer's step
    # Fillet1 outline → Fillet1 (add)
    with BuildSketch(Plane(origin=(0, 0, 0), x_dir=(1, 0, 0), z_dir=(0, 1, 0)).offset(FILLET1_START)):
        with BuildLine():
            ThreePointArc((42.85277772, -17.253948776), (43.403380509, -20.022015918), (41.056726496, -21.59))
            Line((41.056726496, -21.59), (47.188828945, -21.59))
            Line((47.188828945, -21.59), (42.85277772, -17.253948776))
        make_face()
        with BuildLine():
            Line((-4.463452319, -21.59), (1.822023727, -21.59))
            ThreePointArc((1.822023727, -21.59), (-0.532957822, -20.001662705), (0.057340176, -17.223119609))
            Line((0.057340176, -17.223119609), (-4.463452319, -21.59))
        make_face()
        with BuildLine():
            ThreePointArc((33.237897552, -8.691171055), (34.20991347, -8.884517043), (35.033948776, -9.435119831))
            Line((35.033948776, -9.435119831), (34.29, -8.691171055))
            Line((34.29, -8.691171055), (33.237897552, -8.691171055))
        make_face()
        with BuildLine():
            Line((8.89, -8.691171055), (8.151746261, -9.404290664))
            ThreePointArc((8.151746261, -9.404290664), (8.964767108, -8.876189506), (9.916429813, -8.691171055))
            Line((9.916429813, -8.691171055), (8.89, -8.691171055))
        make_face()
        with BuildLine():
            ThreePointArc((3.546525324, -37.425830617), (2.226050592, -34.56984656), (4.696308547, -32.620968913))
            Line((4.696308547, -32.620968913), (-5.918169451, -32.620968913))
            Line((-5.918169451, -32.620968913), (3.546525324, -37.425830617))
        make_face()
        with BuildLine():
            Line((45.002146373, -32.620968913), (36.909521955, -32.620968913))
            ThreePointArc((36.909521955, -32.620968913), (39.332956728, -34.400335032), (38.360975969, -37.245406786))
            Line((38.360975969, -37.245406786), (45.002146373, -32.620968913))
        make_face()
        with BuildLine():
            ThreePointArc((24.77830006, -46.703414497), (23.502600153, -47.152888717), (22.177062823, -46.883838328))
            Line((22.177062823, -46.883838328), (23.531635553, -47.571502833))
            Line((23.531635553, -47.571502833), (24.77830006, -46.703414497))
        make_face()
        with BuildLine():
            ThreePointArc((44.734537362, -45.021511278), (42.311102589, -43.24214516), (43.283083348, -40.397073406))
            Line((43.283083348, -40.397073406), (36.641912944, -45.021511278))
            Line((36.641912944, -45.021511278), (44.734537362, -45.021511278))
        make_face()
        with BuildLine():
            Line((52.262098779, -34.144726831), (48.270644765, -36.924091008))
            ThreePointArc((48.270644765, -36.924091008), (50.897876565, -36.757052343), (52.262098779, -39.008528881))
            Line((52.262098779, -39.008528881), (52.262098779, -34.144726831))
        make_face()
        with BuildLine():
            ThreePointArc((52.262098779, -42.481511278), (51.518150003, -44.277562502), (49.722098779, -45.021511278))
            Line((49.722098779, -45.021511278), (52.262098779, -45.021511278))
            Line((52.262098779, -45.021511278), (52.262098779, -42.481511278))
        make_face()
    extrude(amount=FILLET1_DEPTH)

    # Fillet1 2 outline → Fillet1 2 (add)
    with BuildSketch(Plane(origin=(0, 0, 0), x_dir=(1, 0, 0), z_dir=(0, 1, 0)).offset(FILLET1_START_2)):
        with BuildLine():
            ThreePointArc((3.546525324, -37.425830617), (2.226050592, -34.56984656), (4.696308547, -32.620968913))
            Line((4.696308547, -32.620968913), (-5.918169451, -32.620968913))
            Line((-5.918169451, -32.620968913), (3.546525324, -37.425830617))
        make_face()
        with BuildLine():
            Line((45.002146373, -32.620968913), (36.909521955, -32.620968913))
            ThreePointArc((36.909521955, -32.620968913), (39.332956728, -34.400335032), (38.360975969, -37.245406786))
            Line((38.360975969, -37.245406786), (45.002146373, -32.620968913))
        make_face()
        with BuildLine():
            ThreePointArc((24.77830006, -46.703414497), (23.502600153, -47.152888717), (22.177062823, -46.883838328))
            Line((22.177062823, -46.883838328), (23.531635553, -47.571502833))
            Line((23.531635553, -47.571502833), (24.77830006, -46.703414497))
        make_face()
        with BuildLine():
            ThreePointArc((44.734537362, -45.021511278), (42.311102589, -43.24214516), (43.283083348, -40.397073406))
            Line((43.283083348, -40.397073406), (36.641912944, -45.021511278))
            Line((36.641912944, -45.021511278), (44.734537362, -45.021511278))
        make_face()
        with BuildLine():
            Line((52.262098779, -34.144726831), (48.270644765, -36.924091008))
            ThreePointArc((48.270644765, -36.924091008), (50.897876565, -36.757052343), (52.262098779, -39.008528881))
            Line((52.262098779, -39.008528881), (52.262098779, -34.144726831))
        make_face()
        with BuildLine():
            ThreePointArc((52.262098779, -42.481511278), (51.518150003, -44.277562502), (49.722098779, -45.021511278))
            Line((49.722098779, -45.021511278), (52.262098779, -45.021511278))
            Line((52.262098779, -45.021511278), (52.262098779, -42.481511278))
        make_face()
    extrude(amount=FILLET1_2_DEPTH)

    # Fillet1 3 outline → Fillet1 3 (add)
    with BuildSketch(Plane(origin=(0, 0, 0), x_dir=(1, 0, 0), z_dir=(0, 1, 0)).offset(FILLET1_START_3)):
        with BuildLine():
            ThreePointArc((42.85277772, -17.253948776), (43.403380509, -20.022015918), (41.056726496, -21.59))
            Line((41.056726496, -21.59), (47.188828945, -21.59))
            Line((47.188828945, -21.59), (42.85277772, -17.253948776))
        make_face()
        with BuildLine():
            Line((-4.463452319, -21.59), (1.822023727, -21.59))
            ThreePointArc((1.822023727, -21.59), (-0.532957822, -20.001662705), (0.057340176, -17.223119609))
            Line((0.057340176, -17.223119609), (-4.463452319, -21.59))
        make_face()
        with BuildLine():
            ThreePointArc((33.237897552, -8.691171055), (34.20991347, -8.884517043), (35.033948776, -9.435119831))
            Line((35.033948776, -9.435119831), (34.29, -8.691171055))
            Line((34.29, -8.691171055), (33.237897552, -8.691171055))
        make_face()
        with BuildLine():
            Line((8.89, -8.691171055), (8.151746261, -9.404290664))
            ThreePointArc((8.151746261, -9.404290664), (8.964767108, -8.876189506), (9.916429813, -8.691171055))
            Line((9.916429813, -8.691171055), (8.89, -8.691171055))
        make_face()
    extrude(amount=FILLET1_3_DEPTH)

    # Fillet4
    fillet4_edges = [part.edges().sort_by_distance(p)[0] for p in [
        (-12.7, -9.525, 25.4),
        (-44.45, -9.525, 25.4),
        (6.35, -9.525, 25.4),
        (6.35, 15.025000062, 25.4),
        (44.575, 15.025000062, 25.4),
        (44.575, -9.525, 25.4),
        (-12.7, 15.025000062, 25.4),
        (-44.45, 15.025000062, 25.4),
    ]]
    fillet(fillet4_edges, radius=FILLET4_R)


solid = part.part
